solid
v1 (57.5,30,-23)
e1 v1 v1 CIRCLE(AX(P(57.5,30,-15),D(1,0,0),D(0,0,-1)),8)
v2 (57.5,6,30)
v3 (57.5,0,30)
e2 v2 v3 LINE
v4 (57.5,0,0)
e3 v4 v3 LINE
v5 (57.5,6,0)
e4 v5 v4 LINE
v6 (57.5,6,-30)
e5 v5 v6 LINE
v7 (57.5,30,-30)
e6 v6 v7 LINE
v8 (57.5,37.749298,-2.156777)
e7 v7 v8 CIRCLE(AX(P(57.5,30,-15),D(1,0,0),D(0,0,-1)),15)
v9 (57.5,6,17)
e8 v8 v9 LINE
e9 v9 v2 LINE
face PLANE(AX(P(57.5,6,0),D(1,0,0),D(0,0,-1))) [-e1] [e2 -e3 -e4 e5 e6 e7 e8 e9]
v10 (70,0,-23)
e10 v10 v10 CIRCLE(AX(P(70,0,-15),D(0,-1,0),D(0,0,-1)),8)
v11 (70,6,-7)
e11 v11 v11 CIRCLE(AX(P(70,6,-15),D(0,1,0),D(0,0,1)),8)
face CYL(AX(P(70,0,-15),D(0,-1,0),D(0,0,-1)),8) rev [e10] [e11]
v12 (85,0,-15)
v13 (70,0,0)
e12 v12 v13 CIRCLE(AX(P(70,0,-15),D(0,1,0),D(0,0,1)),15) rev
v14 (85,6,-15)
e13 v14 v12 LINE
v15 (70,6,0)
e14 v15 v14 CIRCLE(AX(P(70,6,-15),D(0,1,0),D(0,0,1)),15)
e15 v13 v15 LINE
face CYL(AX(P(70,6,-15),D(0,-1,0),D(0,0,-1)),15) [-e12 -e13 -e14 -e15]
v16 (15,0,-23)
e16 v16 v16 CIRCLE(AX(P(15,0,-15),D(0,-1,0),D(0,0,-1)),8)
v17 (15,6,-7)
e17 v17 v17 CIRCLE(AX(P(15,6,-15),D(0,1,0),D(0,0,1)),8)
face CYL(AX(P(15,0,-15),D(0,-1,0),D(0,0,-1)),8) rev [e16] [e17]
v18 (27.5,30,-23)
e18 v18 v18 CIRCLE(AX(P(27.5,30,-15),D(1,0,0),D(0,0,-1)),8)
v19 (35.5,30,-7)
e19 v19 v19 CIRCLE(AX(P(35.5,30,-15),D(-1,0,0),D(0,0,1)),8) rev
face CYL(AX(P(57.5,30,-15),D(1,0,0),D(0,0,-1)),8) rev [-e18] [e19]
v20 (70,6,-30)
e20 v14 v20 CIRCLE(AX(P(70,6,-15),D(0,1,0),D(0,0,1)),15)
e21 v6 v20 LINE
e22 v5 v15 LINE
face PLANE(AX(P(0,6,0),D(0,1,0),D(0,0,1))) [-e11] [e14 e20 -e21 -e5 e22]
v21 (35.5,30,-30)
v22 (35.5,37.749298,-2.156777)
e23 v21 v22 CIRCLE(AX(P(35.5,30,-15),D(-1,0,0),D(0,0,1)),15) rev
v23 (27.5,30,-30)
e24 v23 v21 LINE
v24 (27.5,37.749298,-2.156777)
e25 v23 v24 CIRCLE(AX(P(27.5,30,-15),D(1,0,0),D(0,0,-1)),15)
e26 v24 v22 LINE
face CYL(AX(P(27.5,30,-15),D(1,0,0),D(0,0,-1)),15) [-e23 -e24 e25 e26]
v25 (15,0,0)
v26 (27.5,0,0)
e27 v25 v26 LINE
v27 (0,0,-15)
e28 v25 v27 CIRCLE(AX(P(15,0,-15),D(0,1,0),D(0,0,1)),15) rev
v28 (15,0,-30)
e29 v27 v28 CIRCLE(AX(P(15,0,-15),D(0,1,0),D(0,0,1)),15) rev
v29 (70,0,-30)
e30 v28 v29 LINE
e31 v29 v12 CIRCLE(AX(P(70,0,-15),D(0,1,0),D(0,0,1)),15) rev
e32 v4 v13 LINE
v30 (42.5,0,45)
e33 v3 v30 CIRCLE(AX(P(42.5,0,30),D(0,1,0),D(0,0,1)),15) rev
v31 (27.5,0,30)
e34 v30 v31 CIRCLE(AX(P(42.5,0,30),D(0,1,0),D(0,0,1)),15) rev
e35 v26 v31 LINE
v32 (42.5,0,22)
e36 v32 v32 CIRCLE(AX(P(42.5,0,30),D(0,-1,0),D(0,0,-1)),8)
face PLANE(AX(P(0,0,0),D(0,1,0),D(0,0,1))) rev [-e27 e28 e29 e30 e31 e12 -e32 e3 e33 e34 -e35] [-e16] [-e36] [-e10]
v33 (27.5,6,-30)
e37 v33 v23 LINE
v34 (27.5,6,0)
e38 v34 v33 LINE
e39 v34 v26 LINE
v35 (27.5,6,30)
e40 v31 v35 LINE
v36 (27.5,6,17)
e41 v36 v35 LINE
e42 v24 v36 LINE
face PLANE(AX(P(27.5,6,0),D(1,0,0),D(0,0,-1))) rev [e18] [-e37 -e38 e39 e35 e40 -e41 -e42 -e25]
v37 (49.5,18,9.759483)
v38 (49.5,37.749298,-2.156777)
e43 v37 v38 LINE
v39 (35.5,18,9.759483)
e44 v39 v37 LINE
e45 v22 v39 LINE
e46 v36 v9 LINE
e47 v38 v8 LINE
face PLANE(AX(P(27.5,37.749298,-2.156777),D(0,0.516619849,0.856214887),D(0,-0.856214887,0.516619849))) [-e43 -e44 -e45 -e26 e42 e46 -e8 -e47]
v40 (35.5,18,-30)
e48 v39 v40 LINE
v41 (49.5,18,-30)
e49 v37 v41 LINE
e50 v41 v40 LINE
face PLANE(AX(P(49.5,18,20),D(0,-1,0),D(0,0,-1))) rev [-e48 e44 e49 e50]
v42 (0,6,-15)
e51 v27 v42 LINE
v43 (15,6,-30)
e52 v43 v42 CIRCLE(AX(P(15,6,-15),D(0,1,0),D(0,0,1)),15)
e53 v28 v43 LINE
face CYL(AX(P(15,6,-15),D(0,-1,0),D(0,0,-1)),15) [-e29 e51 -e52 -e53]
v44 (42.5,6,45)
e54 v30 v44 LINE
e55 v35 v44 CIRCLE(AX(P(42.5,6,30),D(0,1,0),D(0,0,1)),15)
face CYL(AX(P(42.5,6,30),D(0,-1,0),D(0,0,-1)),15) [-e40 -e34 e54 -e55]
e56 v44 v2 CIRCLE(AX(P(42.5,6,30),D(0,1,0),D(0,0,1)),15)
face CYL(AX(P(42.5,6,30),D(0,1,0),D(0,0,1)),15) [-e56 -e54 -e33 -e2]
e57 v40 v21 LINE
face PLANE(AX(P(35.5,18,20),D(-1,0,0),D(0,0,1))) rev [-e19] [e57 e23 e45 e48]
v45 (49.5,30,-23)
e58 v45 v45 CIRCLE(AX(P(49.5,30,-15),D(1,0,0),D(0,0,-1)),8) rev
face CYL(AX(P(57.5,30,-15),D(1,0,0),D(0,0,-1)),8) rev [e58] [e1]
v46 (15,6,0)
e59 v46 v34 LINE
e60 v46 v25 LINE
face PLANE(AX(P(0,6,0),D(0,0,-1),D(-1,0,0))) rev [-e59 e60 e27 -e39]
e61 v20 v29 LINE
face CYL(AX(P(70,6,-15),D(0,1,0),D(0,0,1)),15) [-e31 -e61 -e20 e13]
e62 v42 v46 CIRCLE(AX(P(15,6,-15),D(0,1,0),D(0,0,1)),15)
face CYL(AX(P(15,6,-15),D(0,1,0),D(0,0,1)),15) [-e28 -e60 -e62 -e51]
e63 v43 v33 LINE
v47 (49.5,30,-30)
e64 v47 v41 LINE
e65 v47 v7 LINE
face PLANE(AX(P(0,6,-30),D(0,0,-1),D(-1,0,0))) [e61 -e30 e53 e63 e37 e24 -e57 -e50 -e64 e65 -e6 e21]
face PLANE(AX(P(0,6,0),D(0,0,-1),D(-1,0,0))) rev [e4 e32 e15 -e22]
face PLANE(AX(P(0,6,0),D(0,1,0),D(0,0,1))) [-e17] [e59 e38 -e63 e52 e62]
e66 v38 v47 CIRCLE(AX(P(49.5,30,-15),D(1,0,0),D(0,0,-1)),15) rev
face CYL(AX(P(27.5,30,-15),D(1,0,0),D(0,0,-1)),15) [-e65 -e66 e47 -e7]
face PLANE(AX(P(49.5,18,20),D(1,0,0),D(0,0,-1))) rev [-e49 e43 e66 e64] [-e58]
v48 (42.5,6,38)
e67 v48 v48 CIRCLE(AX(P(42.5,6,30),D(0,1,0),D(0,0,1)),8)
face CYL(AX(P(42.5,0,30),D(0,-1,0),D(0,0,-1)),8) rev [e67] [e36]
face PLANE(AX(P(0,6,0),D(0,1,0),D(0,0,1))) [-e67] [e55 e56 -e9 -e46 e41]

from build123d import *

# Parameters (mm, degrees)
BOSS_EXTRUDE1_DEPTH                 = 6
FILLET1_R                           = 15
BOSS_EXTRUDE2_DEPTH                 = 30
F_16_0_16_DIAMETER_HOLE1_D          = 16
SKETCH4_W                           = 14
SKETCH4_H                           = 27
CUT_EXTRUDE1_DEPTH                  = 50
SKETCH5_W                           = 8
SKETCH5_H                           = 6.001
F_16_0_16_DIAMETER_HOLE2_AT_2_COUNT = 2
F_16_0_16_DIAMETER_HOLE2_AT_2_PITCH = 52.737557774
F_16_0_16_DIAMETER_HOLE2_AT_3_COUNT = 2
F_16_0_16_DIAMETER_HOLE2_AT_3_PITCH = 52.737557774


with BuildPart() as part:
    # Sketch1 → Boss-Extrude1 (new body)
    with BuildSketch(Plane(origin=(0, 0, 0), x_dir=(1, 0, 0), z_dir=(0, 1, 0))):
        Polygon((57.5, 0), (57.5, -45), (27.5, -45), (27.5, 0), (0, 0), (0, 30), (85, 30), (85, 0), align=None)
    extrude(amount=BOSS_EXTRUDE1_DEPTH)

    # Fillet1
    fillet1_edges = [part.edges().sort_by_distance(p)[0] for p in [
        (85, 3, -30),
        (85, 3, 0),
        (0, 3, -30),
        (0, 3, 0),
        (27.5, 3, 45),
        (57.5, 3, 45),
    ]]
    fillet(fillet1_edges, radius=FILLET1_R - 0.0001)  # a hair under: the kernel refuses the full size

    # Sketch2 → Boss-Extrude2 (add)
    with BuildSketch(Plane(origin=(57.5, 0, 0), x_dir=(0, 0, -1), z_dir=(1, 0, 0))):
        with BuildLine():
            Line((-17, 6), (30, 6))
            Line((30, 6), (30, 30))
            ThreePointArc((30, 30), (19.021918108, 44.450749971), (2.156776702, 37.749297731))
            Line((2.156776702, 37.749297731), (-17, 6))
        make_face()
    extrude(amount=-BOSS_EXTRUDE2_DEPTH)

    # Ø16.0 (16) Diameter Hole1 (through all)
    with Locations(Plane(origin=(57.5, 30, -15), x_dir=(0, 0, 1), z_dir=(1, 0, 0))):
        with Locations((0, 0)):
            Hole(F_16_0_16_DIAMETER_HOLE1_D / 2)

    # Sketch4 → Cut-Extrude1 (cut)
    with BuildSketch(Plane(origin=(0, 0, -30), x_dir=(-1, 0, 0), z_dir=(0, 0, -1))):
        with Locations((-42.5, 31.5)):
            Rectangle(SKETCH4_W, SKETCH4_H)
    extrude(amount=-CUT_EXTRUDE1_DEPTH, mode=Mode.SUBTRACT)

    # Sketch5 → Ø16.0 (16) Diameter Hole2 (revolve, cut)
    with BuildSketch(Plane(origin=(42.5, 0, 30), x_dir=(0, 0, -1), z_dir=(1, 0, 0))):
        with Locations((4, 3.0005)):
            Rectangle(SKETCH5_W, SKETCH5_H)
    f_16_0_16_diameter_hole2 = revolve(axis=Axis((42.5, -6.35, 30), (0, 1, 0)), mode=Mode.SUBTRACT)

    # Ø16.0 (16) Diameter Hole2 at 2: Ø16.0 (16) Diameter Hole2 ×2
    with Locations(*[Vector(-0.521450009453975, 0, -0.853281833651959) * (i * F_16_0_16_DIAMETER_HOLE2_AT_2_PITCH) for i in range(1, F_16_0_16_DIAMETER_HOLE2_AT_2_COUNT)]):
        add(f_16_0_16_diameter_hole2, mode=Mode.SUBTRACT)

    # Ø16.0 (16) Diameter Hole2 at 3: Ø16.0 (16) Diameter Hole2 ×2
    with Locations(*[Vector(0.5214500094539749, 0, -0.8532818336519591) * (i * F_16_0_16_DIAMETER_HOLE2_AT_3_PITCH) for i in range(1, F_16_0_16_DIAMETER_HOLE2_AT_3_COUNT)]):
        add(f_16_0_16_diameter_hole2, mode=Mode.SUBTRACT)


solid = part.part
